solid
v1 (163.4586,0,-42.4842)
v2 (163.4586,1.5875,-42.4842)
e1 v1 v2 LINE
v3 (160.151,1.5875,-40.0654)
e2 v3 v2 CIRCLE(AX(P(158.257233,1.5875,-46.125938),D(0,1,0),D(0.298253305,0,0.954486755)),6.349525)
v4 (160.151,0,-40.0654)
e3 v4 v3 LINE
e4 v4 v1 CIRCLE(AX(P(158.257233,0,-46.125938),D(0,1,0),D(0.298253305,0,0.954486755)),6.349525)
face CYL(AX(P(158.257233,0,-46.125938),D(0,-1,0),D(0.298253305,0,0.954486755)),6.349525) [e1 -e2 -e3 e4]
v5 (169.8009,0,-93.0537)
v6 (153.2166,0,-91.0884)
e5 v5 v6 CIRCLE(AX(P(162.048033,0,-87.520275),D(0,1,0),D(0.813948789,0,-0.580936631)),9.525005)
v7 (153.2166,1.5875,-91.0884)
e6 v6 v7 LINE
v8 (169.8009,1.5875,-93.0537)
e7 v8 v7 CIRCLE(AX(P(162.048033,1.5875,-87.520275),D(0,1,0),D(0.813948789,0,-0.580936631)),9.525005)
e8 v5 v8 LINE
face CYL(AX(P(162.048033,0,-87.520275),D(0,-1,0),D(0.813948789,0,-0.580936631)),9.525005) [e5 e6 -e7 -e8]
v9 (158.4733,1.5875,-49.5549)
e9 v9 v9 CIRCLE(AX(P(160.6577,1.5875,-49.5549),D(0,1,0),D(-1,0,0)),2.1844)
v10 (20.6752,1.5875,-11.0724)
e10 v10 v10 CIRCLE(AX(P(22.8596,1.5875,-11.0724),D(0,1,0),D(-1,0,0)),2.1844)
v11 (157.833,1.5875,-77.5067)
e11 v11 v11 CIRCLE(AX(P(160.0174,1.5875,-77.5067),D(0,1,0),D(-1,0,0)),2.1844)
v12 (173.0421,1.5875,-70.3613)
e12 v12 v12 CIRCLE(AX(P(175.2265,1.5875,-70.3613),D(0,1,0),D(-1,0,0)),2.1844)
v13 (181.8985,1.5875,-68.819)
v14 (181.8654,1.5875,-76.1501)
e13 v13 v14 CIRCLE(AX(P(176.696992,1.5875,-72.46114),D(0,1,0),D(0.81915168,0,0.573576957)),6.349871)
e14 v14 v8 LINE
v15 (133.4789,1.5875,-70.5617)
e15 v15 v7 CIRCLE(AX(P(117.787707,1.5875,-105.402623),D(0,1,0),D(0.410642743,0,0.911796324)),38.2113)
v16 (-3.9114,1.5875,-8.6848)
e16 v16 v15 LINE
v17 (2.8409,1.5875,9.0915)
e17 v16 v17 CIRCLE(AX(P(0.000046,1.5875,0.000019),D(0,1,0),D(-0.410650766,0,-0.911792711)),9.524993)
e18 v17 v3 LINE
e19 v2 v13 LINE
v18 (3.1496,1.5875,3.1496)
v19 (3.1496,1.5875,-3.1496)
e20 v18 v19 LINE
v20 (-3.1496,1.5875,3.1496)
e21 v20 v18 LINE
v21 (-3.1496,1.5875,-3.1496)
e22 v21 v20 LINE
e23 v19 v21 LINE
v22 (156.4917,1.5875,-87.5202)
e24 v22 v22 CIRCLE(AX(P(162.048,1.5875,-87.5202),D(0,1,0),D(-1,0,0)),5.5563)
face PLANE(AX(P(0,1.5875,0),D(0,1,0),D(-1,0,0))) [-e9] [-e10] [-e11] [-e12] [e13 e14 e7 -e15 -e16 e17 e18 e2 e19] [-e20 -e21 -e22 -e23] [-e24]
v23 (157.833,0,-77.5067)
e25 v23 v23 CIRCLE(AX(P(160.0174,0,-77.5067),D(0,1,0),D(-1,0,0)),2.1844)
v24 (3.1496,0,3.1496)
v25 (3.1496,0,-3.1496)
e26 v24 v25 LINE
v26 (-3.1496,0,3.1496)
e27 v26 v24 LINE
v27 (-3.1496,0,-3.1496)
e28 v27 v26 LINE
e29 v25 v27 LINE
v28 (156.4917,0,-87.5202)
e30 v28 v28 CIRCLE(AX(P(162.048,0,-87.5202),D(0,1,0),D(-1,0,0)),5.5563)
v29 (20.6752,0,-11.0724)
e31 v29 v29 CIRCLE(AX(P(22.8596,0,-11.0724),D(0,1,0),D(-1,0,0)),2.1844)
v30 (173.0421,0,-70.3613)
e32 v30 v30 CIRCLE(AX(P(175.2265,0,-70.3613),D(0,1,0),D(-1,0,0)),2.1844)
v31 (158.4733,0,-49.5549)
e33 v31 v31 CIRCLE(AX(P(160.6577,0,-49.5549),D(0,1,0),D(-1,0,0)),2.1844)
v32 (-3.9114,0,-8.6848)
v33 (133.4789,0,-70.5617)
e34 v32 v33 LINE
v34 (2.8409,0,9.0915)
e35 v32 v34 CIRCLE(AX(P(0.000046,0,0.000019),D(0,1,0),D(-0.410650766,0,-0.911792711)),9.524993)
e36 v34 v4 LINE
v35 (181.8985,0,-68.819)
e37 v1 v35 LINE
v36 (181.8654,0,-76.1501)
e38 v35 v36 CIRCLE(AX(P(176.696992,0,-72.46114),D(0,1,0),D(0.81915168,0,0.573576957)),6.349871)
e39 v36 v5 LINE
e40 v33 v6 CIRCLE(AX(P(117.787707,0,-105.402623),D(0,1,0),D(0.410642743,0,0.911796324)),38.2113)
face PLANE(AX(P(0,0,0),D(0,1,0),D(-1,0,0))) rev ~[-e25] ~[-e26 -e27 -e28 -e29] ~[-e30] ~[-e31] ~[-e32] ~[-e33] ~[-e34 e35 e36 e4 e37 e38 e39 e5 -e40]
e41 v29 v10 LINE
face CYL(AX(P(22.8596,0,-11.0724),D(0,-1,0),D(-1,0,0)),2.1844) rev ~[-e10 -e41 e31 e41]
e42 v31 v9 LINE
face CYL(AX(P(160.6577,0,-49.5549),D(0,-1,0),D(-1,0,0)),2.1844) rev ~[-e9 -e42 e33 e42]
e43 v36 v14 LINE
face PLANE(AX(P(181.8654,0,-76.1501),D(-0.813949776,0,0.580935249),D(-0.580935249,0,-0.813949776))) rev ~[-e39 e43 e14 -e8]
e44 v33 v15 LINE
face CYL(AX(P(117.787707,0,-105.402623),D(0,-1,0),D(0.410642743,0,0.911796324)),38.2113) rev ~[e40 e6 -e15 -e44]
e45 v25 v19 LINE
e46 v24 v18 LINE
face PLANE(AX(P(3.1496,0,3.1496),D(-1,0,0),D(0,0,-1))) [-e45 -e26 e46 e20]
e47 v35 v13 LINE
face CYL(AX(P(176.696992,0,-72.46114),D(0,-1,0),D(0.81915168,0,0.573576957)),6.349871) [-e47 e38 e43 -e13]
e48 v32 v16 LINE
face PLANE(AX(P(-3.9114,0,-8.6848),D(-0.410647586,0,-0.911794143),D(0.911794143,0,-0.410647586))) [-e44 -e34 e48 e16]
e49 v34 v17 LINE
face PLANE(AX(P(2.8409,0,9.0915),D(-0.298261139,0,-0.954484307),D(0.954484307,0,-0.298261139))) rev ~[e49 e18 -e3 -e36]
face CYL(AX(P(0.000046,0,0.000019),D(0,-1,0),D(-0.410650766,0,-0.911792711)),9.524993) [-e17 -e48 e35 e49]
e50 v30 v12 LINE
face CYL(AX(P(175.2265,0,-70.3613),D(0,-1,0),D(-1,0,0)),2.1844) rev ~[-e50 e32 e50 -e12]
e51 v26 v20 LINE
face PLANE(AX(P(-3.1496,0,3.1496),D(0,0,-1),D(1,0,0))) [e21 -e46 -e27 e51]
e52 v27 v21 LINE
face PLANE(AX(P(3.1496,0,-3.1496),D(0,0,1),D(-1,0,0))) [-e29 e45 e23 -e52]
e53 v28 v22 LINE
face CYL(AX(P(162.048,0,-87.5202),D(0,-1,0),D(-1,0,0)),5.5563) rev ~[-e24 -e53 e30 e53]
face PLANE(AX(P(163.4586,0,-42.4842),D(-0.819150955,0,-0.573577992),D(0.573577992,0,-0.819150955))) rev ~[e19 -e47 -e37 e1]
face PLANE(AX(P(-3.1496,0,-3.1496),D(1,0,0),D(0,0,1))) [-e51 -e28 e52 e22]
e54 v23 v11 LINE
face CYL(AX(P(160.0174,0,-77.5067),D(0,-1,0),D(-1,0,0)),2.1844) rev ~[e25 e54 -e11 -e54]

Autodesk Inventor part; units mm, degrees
ref_plane "YZ Plane" through (0, 0, 0) normal (1, 0, 0) x (0, 1, 0)
ref_plane "XZ Plane" through (0, 0, 0) normal (0, 1, 0) x (-1, 0, 0)
ref_plane "XY Plane" through (0, 0, 0) normal (0, 0, 1) x (1, 0, 0)
sketch "main" plane through (0, 0, 0) normal (0, 0, 1) x (1, 0, 0)
  arc A0 (-76.9765, 33.0075) -> (-80.2841, 30.5888) centre (-75.0825, 26.9465) ccw
  circle A1 centre (-77.4831, 23.5181) radius 2.1844
  circle A2 centre (-76.8428, -4.4337) radius 2.1844
  arc A3 (-57.2294, -80.4633) -> (-56.4581, -83.5168) centre (-56.6485, -81.9407) ccw
  circle A4 centre (-92.052, 2.7116) radius 2.1844
  circle A5 centre (-78.8735, -14.4473) radius 5.5563
  line L0 (-80.2841, 30.5888) -> (-98.7239, 4.254)
  arc A6 (-98.7239, 4.254) -> (-98.6909, -3.0772) centre (-93.5223, 0.6117) ccw
  arc A7 (-86.6264, -19.9807) -> (-70.0421, -18.0155) centre (-78.8735, -14.4473) ccw
  line L1 (-98.6909, -3.0772) -> (-86.6264, -19.9807)
  arc A8 (87.0859, 64.3881) -> (80.3336, 82.1644) centre (83.1745, 73.0729) ccw
  line L2 (86.3241, 76.2225) -> (80.0249, 76.2225)
  line L3 (80.0249, 76.2225) -> (80.0249, 69.9233)
  line L4 (80.0249, 69.9233) -> (86.3241, 69.9233)
  line L5 (86.3241, 69.9233) -> (86.3241, 76.2225)
  line L6 (86.3241, 76.2225) -> (80.0249, 69.9233) construction
  line L7 (80.0249, 76.2225) -> (86.3241, 69.9233) construction
  circle A9 centre (60.3149, 62.0006) radius 2.1844
  line L8 (87.0859, 64.3881) -> (-50.3044, 2.5112)
  arc A10 (-50.3044, 2.5112) -> (-70.0421, -18.0155) centre (-34.6127, -32.3302) ccw
  line L9 (80.3336, 82.1644) -> (-76.9765, 33.0075)
  point P0 (-51.4681, 8.9463)
  point P1 (-79.4455, 31.7864)
  point P2 (-101.2988, 0.5767)
  dimension "d4" = 11.1125
  dimension "d5" = 19.05
  dimension "d6" = 19.05
  dimension "d7" = 38.1
  dimension "d8" = 4.3688
  dimension "d9" = 6.35
  dimension "d10" = 25.4
  dimension "d11" = 6.35
  dimension "d13" = 4.3688
  dimension "d20" = 6.2992
  dimension "d21" = 6.2992
  dimension "d24" = 4.3688
  dimension "d25" = 25.4
sketch "Sketch1" plane through (0, 0, 0) normal (0, 1, 0) x (-1, 0, 0)
  arc A0 (-160.151, -40.0654) -> (-163.4586, -42.4842) centre (-158.257, -46.1264) ccw
  circle A1 centre (-160.6577, -49.5549) radius 2.1844
  circle A2 centre (-160.0174, -77.5067) radius 2.1844
  arc A3 (-140.4039, -153.5363) -> (-139.6326, -156.5897) centre (-139.823, -155.0137) ccw
  circle A4 centre (-175.2265, -70.3613) radius 2.1844
  circle A5 centre (-162.048, -87.5202) radius 5.5563
  line L0 (-163.4586, -42.4842) -> (-181.8985, -68.819)
  arc A6 (-181.8985, -68.819) -> (-181.8654, -76.1501) centre (-176.6968, -72.4612) ccw
  arc A7 (-169.8009, -93.0537) -> (-153.2166, -91.0884) centre (-162.048, -87.5202) ccw
  line L1 (-181.8654, -76.1501) -> (-169.8009, -93.0537)
  arc A8 (3.9114, -8.6848) -> (-2.8409, 9.0915) centre (0, 0) ccw
  line L2 (3.1496, 3.1496) -> (-3.1496, 3.1496)
  line L3 (-3.1496, 3.1496) -> (-3.1496, -3.1496)
  line L4 (-3.1496, -3.1496) -> (3.1496, -3.1496)
  line L5 (3.1496, -3.1496) -> (3.1496, 3.1496)
  line L6 (3.1496, 3.1496) -> (-3.1496, -3.1496) construction
  line L7 (-3.1496, 3.1496) -> (3.1496, -3.1496) construction
  circle A9 centre (-22.8596, -11.0724) radius 2.1844
  line L8 (3.9114, -8.6848) -> (-133.4789, -70.5617)
  arc A10 (-133.4789, -70.5617) -> (-153.2166, -91.0884) centre (-117.7873, -105.4032) ccw
  line L9 (-2.8409, 9.0915) -> (-160.151, -40.0654)
  point P0 (0, 0)
extrude "Extrusion1" add sketch "Sketch1" along normal blind 1.5875
properties part number "Gusset" material "Acetal Resin, White"
